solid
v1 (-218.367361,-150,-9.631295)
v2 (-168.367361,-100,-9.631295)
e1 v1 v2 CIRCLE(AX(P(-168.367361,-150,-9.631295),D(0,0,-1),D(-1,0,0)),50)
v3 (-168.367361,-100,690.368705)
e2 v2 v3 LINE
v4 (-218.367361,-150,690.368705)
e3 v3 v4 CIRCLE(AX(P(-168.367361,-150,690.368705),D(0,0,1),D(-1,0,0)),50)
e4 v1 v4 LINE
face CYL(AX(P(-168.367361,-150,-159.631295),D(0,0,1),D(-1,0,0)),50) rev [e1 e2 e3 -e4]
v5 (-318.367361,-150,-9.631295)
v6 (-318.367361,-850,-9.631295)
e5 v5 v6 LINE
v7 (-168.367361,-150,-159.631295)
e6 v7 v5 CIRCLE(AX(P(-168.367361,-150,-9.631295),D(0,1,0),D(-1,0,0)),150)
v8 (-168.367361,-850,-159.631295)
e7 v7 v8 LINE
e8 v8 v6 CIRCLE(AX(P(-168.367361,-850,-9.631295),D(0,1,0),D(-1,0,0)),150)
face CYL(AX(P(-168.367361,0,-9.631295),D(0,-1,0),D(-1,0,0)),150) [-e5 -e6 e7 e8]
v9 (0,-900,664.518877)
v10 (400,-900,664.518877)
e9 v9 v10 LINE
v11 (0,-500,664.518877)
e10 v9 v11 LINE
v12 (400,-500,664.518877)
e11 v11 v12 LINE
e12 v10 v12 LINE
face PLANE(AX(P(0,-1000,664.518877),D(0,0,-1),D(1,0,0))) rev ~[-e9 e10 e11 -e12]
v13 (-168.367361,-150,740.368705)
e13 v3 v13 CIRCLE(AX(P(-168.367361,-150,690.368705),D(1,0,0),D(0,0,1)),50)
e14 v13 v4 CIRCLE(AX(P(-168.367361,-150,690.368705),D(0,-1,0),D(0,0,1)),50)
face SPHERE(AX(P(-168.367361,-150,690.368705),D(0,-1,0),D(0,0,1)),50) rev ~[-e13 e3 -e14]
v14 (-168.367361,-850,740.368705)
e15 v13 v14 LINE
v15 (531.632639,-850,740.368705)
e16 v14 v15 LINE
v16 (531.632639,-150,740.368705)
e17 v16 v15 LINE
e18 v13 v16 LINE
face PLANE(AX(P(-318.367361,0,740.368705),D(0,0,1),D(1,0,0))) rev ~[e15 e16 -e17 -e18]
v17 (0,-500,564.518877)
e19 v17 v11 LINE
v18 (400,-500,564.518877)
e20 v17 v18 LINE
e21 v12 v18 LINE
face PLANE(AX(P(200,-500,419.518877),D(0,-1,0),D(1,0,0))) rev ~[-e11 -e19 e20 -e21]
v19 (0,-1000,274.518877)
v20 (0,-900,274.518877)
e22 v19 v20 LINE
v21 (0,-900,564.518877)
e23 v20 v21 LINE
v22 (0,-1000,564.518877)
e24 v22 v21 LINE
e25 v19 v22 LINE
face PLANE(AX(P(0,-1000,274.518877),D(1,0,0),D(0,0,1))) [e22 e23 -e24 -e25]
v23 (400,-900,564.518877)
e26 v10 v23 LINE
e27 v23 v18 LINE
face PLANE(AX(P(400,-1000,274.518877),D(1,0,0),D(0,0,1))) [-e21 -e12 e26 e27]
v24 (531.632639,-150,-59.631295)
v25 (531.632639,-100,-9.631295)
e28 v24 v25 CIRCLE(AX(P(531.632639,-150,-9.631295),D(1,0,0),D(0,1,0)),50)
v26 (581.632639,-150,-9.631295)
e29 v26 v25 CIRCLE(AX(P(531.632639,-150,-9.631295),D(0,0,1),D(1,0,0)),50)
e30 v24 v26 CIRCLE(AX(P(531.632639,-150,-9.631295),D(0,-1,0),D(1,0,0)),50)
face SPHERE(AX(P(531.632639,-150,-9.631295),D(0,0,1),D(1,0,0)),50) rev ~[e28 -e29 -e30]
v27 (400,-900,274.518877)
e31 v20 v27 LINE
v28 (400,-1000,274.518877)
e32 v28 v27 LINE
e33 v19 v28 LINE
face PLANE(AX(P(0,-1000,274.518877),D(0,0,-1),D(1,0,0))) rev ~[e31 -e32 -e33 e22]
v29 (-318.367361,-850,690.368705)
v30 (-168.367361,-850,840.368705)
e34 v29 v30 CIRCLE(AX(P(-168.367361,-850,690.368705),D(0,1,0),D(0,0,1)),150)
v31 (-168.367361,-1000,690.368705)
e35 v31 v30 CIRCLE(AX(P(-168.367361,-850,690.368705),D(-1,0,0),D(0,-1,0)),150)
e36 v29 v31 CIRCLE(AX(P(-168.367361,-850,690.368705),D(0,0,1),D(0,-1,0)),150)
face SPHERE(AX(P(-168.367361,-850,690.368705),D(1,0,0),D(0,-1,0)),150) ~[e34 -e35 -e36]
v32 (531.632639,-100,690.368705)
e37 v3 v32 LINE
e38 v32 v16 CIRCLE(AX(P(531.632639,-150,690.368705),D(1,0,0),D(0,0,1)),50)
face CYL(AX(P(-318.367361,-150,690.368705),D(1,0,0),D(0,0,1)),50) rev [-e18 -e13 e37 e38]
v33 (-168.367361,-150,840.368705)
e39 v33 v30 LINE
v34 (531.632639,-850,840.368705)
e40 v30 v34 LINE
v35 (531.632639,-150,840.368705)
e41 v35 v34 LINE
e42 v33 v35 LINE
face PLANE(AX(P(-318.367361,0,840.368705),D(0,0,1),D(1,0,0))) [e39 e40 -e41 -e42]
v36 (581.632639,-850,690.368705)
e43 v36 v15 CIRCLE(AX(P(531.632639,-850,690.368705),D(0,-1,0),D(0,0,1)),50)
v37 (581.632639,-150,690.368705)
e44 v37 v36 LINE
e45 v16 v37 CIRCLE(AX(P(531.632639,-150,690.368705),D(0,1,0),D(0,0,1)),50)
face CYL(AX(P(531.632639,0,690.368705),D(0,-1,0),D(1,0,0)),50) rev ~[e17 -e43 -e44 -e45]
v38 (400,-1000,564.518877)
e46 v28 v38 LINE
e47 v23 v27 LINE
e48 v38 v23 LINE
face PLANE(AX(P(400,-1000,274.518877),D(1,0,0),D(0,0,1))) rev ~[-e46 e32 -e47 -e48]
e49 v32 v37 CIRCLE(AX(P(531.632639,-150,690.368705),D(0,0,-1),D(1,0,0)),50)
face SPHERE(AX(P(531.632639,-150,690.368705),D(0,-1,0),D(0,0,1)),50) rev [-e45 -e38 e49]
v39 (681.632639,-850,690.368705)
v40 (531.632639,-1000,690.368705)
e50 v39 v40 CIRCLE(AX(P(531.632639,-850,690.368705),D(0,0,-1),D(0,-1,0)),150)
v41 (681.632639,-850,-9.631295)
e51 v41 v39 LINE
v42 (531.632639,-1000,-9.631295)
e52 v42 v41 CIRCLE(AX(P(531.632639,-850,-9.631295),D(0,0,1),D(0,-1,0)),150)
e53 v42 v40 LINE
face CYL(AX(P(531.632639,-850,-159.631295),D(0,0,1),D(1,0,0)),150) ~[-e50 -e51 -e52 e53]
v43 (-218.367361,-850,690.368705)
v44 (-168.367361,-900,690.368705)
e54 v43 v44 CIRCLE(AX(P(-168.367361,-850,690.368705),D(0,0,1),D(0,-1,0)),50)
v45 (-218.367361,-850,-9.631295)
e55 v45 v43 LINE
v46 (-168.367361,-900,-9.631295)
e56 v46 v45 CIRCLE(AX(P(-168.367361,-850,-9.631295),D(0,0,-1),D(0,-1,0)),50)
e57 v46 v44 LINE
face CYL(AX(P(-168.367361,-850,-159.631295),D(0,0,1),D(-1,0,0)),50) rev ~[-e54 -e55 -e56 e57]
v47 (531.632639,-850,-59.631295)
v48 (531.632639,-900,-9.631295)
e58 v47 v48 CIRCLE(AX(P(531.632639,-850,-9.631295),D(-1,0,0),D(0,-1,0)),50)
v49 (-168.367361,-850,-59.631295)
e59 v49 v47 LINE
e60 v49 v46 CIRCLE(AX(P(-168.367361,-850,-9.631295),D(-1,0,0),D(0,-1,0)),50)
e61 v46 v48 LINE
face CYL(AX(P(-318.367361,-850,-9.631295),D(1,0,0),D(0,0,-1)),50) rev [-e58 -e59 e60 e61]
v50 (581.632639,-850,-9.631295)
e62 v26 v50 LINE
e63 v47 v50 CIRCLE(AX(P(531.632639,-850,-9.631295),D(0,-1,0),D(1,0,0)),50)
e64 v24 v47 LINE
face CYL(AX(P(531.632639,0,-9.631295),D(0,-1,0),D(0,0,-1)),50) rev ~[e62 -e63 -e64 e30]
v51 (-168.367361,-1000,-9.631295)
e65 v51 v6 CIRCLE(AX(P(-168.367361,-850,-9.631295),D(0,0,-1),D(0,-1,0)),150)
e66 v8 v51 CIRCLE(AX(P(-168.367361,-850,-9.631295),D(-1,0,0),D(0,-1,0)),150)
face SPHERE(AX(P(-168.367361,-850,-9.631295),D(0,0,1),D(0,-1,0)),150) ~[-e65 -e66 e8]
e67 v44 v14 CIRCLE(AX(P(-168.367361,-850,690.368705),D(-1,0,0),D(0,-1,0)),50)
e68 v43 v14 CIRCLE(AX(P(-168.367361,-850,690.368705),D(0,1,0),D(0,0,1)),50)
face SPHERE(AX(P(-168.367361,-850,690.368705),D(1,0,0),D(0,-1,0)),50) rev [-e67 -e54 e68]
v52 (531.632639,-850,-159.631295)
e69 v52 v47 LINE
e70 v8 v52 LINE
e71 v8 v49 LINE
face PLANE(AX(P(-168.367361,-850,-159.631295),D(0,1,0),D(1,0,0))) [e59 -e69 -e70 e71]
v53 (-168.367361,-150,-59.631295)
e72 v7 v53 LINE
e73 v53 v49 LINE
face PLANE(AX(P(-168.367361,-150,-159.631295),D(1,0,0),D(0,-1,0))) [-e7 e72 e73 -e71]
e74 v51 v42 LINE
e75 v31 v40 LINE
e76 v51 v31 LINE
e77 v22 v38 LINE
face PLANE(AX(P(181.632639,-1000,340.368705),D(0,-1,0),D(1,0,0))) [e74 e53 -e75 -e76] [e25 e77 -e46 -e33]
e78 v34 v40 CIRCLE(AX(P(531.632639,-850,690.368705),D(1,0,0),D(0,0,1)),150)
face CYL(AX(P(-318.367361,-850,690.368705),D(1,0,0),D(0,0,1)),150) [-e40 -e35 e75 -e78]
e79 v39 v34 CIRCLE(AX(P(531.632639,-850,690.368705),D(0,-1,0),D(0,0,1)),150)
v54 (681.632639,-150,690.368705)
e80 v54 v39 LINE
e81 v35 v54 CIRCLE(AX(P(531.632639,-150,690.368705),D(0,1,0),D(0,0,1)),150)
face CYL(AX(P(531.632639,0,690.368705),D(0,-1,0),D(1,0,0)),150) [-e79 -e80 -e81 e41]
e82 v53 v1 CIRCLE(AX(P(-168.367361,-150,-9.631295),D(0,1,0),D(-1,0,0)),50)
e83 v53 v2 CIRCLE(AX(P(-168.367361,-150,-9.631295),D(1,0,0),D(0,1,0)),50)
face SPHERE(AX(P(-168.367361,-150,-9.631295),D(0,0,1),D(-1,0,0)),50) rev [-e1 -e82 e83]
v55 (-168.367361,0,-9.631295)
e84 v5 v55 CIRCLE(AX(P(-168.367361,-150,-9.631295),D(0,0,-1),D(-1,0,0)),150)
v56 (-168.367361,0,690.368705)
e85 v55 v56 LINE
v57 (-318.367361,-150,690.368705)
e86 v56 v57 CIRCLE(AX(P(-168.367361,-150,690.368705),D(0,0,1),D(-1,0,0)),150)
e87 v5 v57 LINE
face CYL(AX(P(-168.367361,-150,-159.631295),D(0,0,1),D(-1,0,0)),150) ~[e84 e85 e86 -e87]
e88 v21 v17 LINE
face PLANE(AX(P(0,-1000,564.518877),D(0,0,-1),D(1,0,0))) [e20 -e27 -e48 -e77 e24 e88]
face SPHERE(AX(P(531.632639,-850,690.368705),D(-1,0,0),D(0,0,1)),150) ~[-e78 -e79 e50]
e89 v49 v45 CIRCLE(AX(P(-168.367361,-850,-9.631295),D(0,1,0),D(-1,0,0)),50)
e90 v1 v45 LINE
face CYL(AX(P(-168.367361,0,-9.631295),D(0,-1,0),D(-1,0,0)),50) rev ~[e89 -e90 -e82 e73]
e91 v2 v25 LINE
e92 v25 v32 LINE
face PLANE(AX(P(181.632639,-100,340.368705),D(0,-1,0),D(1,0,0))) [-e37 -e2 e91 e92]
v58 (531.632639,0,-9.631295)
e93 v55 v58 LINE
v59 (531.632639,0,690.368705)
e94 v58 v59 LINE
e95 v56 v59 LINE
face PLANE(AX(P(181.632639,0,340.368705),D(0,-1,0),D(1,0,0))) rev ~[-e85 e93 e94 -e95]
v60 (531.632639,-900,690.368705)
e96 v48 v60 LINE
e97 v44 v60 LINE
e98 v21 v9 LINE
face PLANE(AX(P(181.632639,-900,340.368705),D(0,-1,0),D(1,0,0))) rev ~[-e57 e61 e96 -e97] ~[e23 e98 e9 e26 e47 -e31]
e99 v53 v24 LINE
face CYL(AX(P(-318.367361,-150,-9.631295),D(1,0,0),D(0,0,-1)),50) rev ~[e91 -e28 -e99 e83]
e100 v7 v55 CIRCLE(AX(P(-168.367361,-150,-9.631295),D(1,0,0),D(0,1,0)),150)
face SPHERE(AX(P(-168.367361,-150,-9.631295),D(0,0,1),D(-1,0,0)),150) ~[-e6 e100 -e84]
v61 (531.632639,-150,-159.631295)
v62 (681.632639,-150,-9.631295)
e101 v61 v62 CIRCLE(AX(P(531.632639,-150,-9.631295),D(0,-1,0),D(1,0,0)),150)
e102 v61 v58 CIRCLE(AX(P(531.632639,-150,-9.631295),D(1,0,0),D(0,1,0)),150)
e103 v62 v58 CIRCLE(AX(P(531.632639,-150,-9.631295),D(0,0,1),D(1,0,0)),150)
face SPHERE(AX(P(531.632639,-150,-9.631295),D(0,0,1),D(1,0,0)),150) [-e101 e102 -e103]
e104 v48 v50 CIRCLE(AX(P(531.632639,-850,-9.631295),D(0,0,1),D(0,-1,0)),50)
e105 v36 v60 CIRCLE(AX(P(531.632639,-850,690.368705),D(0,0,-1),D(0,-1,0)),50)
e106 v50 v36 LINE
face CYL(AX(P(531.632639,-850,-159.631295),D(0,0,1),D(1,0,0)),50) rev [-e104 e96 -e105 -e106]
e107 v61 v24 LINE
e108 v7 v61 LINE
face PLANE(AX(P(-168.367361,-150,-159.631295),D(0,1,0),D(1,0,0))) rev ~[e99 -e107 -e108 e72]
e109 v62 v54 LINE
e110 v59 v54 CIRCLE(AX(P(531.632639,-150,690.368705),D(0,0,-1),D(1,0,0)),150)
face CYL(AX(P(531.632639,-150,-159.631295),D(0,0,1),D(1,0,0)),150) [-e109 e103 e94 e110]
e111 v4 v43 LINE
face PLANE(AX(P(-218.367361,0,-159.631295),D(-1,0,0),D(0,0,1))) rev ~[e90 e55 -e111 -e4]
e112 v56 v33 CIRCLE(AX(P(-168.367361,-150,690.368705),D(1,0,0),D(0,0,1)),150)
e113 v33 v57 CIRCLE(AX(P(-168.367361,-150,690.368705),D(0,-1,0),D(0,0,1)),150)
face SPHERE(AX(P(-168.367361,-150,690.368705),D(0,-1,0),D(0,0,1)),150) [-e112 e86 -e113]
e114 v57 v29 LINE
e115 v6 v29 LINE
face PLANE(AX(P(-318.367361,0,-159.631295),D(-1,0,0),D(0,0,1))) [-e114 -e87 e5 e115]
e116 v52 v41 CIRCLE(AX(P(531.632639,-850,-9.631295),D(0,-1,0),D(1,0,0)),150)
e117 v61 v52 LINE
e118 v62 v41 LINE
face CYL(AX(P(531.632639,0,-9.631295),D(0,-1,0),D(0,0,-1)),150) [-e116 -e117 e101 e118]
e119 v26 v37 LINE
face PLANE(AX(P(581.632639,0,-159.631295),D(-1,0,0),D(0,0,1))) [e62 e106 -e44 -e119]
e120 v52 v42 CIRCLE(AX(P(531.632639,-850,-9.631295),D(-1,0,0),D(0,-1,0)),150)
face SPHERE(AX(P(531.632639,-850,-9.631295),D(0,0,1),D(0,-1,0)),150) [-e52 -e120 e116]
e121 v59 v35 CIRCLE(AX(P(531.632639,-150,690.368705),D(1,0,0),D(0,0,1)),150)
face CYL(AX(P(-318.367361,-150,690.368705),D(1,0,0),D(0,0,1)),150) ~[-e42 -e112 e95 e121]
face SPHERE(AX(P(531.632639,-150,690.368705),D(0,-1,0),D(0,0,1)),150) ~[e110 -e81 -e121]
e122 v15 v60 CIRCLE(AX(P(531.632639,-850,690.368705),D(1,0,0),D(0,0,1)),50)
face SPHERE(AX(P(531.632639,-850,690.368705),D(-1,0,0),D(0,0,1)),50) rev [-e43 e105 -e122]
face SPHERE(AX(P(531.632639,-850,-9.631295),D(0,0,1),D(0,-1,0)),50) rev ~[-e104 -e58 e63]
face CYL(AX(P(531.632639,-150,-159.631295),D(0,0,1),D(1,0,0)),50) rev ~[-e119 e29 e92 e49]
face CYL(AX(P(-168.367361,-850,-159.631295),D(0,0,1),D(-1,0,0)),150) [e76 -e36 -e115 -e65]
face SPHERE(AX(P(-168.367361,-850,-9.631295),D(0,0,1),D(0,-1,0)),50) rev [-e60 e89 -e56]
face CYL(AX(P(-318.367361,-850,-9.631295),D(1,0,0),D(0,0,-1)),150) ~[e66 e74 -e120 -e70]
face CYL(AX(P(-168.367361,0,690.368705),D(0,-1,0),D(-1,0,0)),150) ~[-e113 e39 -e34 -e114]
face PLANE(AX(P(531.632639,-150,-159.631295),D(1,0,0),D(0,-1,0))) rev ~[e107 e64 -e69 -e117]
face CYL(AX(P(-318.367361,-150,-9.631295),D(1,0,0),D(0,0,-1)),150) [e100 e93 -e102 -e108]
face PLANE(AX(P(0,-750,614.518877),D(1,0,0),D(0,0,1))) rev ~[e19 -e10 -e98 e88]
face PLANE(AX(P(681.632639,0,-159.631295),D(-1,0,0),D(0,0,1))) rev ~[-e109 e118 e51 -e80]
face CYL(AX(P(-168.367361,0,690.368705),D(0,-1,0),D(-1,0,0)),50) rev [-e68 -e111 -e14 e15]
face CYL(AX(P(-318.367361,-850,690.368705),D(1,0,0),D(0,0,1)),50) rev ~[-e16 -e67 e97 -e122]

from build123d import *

# Parameters (mm, degrees)
F0_W     = 1000
F0_H     = 1000
F1_DEPTH = 1000
F2_R     = 150
F3_W     = 400
F3_H     = 290
F4_DEPTH = 500
F5_T     = 100
F6_W     = 700
F6_H     = 700
F7_DEPTH = 500


# Not quite as in the source:
# - a shell that OpenCascade refuses in one call is made with other operations: the cavity is built on its own and cut out


with BuildPart() as f1:
    # F0 (on Front) → F1 (new body)
    with BuildSketch(Plane.XZ):
        with Locations((181.6326389278, 340.3687052429)):
            Rectangle(F0_W, F0_H)
    extrude(amount=F1_DEPTH)

    # F2
    f2_edges = [f1.edges().sort_by_distance(p)[0] for p in [
        (181.632639, -1000, 840.368705),
        (681.632639, -500, 840.368705),
        (681.632639, -1000, 340.368705),
        (-318.367361, -1000, 340.368705),
        (-318.367361, -500, 840.368705),
        (181.632639, 0, 840.368705),
        (681.632639, 0, 340.368705),
        (-318.367361, 0, 340.368705),
        (181.632639, -1000, -159.631295),
        (681.632639, -500, -159.631295),
        (-318.367361, -500, -159.631295),
        (181.632639, 0, -159.631295),
    ]]
    fillet(f2_edges, radius=F2_R)

    # F3 (on face) → F4 (cut)
    with BuildSketch(Plane.XZ.offset(1000)):
        with Locations((200, 419.5188772678)):
            Rectangle(F3_W, F3_H)
    extrude(amount=-F4_DEPTH, mode=Mode.SUBTRACT)

    # F5: shell of thickness 100, made by hand


with BuildPart() as f5_core1:
    # F5_t2: copy of F1
    add(f1.part)

    # the walls: a layer under each face that stays
    f5_faces = [f5_core1.faces().sort_by_distance(p)[0] for p in [
        (-318.3673610722, -500, 340.3687052429),
        (-274.4333782502, -956.066017178, 340.3687052429),
        (-274.4333782502, -500, 796.4347224209),
        (-274.4333782502, -500, -115.6973119351),
        (-274.4333782502, -43.933982822, 340.3687052429),
        (-274.4333782502, -925, 765.3687052429),
        (-51.7006944055, -1000, 107.0353719095),
        (-243.3673610722, -925, -115.6973119351),
        (-243.3673610722, -43.933982822, 765.3687052429),
        (181.6326389278, -500, 840.3687052429),
        (-243.3673610722, -75, -115.6973119351),
        (181.6326389278, -500, -159.6312947571),
        (181.6326389278, 0, 340.3687052429),
        (181.6326389278, -956.066017178, 796.4347224209),
        (637.6986561058, -956.066017178, 340.3687052429),
        (181.6326389278, -956.066017178, -115.6973119351),
        (200, -750, 564.5188772678),
        (181.6326389278, -43.933982822, 796.4347224209),
        (637.6986561058, -500, 796.4347224209),
        (181.6326389278, -43.933982822, -115.6973119351),
        (637.6986561058, -500, -115.6973119351),
        (637.6986561058, -43.933982822, 340.3687052429),
        (637.6986561058, -925, 765.3687052429),
        (681.6326389278, -500, 340.3687052429),
        (606.6326389278, -925, -115.6973119351),
        (606.6326389278, -43.933982822, 765.3687052429),
        (606.6326389278, -75, -115.6973119351),
    ]]
    thicken(f5_faces, amount=-F5_T, mode=Mode.SUBTRACT)


with BuildPart() as f1_1:
    add(f1.part)

    # what is left inside the walls is the cavity
    f5_cavity = [f5_core1.part.solids().sort_by_distance(p)[0] for p in [
        (181.632639, -101, 223.702039),
    ]]
    add(f5_cavity, mode=Mode.SUBTRACT)

    # F6 (on face) → F7 (cut)
    with BuildSketch(Plane(origin=(0, 0, -159.6312947571), x_dir=(1, 0, 0), z_dir=(0, 0, -1))):
        with Locations((181.6326389278, 500)):
            Rectangle(F6_W, F6_H)
    extrude(amount=-F7_DEPTH, mode=Mode.SUBTRACT)


solid = f1_1.part
